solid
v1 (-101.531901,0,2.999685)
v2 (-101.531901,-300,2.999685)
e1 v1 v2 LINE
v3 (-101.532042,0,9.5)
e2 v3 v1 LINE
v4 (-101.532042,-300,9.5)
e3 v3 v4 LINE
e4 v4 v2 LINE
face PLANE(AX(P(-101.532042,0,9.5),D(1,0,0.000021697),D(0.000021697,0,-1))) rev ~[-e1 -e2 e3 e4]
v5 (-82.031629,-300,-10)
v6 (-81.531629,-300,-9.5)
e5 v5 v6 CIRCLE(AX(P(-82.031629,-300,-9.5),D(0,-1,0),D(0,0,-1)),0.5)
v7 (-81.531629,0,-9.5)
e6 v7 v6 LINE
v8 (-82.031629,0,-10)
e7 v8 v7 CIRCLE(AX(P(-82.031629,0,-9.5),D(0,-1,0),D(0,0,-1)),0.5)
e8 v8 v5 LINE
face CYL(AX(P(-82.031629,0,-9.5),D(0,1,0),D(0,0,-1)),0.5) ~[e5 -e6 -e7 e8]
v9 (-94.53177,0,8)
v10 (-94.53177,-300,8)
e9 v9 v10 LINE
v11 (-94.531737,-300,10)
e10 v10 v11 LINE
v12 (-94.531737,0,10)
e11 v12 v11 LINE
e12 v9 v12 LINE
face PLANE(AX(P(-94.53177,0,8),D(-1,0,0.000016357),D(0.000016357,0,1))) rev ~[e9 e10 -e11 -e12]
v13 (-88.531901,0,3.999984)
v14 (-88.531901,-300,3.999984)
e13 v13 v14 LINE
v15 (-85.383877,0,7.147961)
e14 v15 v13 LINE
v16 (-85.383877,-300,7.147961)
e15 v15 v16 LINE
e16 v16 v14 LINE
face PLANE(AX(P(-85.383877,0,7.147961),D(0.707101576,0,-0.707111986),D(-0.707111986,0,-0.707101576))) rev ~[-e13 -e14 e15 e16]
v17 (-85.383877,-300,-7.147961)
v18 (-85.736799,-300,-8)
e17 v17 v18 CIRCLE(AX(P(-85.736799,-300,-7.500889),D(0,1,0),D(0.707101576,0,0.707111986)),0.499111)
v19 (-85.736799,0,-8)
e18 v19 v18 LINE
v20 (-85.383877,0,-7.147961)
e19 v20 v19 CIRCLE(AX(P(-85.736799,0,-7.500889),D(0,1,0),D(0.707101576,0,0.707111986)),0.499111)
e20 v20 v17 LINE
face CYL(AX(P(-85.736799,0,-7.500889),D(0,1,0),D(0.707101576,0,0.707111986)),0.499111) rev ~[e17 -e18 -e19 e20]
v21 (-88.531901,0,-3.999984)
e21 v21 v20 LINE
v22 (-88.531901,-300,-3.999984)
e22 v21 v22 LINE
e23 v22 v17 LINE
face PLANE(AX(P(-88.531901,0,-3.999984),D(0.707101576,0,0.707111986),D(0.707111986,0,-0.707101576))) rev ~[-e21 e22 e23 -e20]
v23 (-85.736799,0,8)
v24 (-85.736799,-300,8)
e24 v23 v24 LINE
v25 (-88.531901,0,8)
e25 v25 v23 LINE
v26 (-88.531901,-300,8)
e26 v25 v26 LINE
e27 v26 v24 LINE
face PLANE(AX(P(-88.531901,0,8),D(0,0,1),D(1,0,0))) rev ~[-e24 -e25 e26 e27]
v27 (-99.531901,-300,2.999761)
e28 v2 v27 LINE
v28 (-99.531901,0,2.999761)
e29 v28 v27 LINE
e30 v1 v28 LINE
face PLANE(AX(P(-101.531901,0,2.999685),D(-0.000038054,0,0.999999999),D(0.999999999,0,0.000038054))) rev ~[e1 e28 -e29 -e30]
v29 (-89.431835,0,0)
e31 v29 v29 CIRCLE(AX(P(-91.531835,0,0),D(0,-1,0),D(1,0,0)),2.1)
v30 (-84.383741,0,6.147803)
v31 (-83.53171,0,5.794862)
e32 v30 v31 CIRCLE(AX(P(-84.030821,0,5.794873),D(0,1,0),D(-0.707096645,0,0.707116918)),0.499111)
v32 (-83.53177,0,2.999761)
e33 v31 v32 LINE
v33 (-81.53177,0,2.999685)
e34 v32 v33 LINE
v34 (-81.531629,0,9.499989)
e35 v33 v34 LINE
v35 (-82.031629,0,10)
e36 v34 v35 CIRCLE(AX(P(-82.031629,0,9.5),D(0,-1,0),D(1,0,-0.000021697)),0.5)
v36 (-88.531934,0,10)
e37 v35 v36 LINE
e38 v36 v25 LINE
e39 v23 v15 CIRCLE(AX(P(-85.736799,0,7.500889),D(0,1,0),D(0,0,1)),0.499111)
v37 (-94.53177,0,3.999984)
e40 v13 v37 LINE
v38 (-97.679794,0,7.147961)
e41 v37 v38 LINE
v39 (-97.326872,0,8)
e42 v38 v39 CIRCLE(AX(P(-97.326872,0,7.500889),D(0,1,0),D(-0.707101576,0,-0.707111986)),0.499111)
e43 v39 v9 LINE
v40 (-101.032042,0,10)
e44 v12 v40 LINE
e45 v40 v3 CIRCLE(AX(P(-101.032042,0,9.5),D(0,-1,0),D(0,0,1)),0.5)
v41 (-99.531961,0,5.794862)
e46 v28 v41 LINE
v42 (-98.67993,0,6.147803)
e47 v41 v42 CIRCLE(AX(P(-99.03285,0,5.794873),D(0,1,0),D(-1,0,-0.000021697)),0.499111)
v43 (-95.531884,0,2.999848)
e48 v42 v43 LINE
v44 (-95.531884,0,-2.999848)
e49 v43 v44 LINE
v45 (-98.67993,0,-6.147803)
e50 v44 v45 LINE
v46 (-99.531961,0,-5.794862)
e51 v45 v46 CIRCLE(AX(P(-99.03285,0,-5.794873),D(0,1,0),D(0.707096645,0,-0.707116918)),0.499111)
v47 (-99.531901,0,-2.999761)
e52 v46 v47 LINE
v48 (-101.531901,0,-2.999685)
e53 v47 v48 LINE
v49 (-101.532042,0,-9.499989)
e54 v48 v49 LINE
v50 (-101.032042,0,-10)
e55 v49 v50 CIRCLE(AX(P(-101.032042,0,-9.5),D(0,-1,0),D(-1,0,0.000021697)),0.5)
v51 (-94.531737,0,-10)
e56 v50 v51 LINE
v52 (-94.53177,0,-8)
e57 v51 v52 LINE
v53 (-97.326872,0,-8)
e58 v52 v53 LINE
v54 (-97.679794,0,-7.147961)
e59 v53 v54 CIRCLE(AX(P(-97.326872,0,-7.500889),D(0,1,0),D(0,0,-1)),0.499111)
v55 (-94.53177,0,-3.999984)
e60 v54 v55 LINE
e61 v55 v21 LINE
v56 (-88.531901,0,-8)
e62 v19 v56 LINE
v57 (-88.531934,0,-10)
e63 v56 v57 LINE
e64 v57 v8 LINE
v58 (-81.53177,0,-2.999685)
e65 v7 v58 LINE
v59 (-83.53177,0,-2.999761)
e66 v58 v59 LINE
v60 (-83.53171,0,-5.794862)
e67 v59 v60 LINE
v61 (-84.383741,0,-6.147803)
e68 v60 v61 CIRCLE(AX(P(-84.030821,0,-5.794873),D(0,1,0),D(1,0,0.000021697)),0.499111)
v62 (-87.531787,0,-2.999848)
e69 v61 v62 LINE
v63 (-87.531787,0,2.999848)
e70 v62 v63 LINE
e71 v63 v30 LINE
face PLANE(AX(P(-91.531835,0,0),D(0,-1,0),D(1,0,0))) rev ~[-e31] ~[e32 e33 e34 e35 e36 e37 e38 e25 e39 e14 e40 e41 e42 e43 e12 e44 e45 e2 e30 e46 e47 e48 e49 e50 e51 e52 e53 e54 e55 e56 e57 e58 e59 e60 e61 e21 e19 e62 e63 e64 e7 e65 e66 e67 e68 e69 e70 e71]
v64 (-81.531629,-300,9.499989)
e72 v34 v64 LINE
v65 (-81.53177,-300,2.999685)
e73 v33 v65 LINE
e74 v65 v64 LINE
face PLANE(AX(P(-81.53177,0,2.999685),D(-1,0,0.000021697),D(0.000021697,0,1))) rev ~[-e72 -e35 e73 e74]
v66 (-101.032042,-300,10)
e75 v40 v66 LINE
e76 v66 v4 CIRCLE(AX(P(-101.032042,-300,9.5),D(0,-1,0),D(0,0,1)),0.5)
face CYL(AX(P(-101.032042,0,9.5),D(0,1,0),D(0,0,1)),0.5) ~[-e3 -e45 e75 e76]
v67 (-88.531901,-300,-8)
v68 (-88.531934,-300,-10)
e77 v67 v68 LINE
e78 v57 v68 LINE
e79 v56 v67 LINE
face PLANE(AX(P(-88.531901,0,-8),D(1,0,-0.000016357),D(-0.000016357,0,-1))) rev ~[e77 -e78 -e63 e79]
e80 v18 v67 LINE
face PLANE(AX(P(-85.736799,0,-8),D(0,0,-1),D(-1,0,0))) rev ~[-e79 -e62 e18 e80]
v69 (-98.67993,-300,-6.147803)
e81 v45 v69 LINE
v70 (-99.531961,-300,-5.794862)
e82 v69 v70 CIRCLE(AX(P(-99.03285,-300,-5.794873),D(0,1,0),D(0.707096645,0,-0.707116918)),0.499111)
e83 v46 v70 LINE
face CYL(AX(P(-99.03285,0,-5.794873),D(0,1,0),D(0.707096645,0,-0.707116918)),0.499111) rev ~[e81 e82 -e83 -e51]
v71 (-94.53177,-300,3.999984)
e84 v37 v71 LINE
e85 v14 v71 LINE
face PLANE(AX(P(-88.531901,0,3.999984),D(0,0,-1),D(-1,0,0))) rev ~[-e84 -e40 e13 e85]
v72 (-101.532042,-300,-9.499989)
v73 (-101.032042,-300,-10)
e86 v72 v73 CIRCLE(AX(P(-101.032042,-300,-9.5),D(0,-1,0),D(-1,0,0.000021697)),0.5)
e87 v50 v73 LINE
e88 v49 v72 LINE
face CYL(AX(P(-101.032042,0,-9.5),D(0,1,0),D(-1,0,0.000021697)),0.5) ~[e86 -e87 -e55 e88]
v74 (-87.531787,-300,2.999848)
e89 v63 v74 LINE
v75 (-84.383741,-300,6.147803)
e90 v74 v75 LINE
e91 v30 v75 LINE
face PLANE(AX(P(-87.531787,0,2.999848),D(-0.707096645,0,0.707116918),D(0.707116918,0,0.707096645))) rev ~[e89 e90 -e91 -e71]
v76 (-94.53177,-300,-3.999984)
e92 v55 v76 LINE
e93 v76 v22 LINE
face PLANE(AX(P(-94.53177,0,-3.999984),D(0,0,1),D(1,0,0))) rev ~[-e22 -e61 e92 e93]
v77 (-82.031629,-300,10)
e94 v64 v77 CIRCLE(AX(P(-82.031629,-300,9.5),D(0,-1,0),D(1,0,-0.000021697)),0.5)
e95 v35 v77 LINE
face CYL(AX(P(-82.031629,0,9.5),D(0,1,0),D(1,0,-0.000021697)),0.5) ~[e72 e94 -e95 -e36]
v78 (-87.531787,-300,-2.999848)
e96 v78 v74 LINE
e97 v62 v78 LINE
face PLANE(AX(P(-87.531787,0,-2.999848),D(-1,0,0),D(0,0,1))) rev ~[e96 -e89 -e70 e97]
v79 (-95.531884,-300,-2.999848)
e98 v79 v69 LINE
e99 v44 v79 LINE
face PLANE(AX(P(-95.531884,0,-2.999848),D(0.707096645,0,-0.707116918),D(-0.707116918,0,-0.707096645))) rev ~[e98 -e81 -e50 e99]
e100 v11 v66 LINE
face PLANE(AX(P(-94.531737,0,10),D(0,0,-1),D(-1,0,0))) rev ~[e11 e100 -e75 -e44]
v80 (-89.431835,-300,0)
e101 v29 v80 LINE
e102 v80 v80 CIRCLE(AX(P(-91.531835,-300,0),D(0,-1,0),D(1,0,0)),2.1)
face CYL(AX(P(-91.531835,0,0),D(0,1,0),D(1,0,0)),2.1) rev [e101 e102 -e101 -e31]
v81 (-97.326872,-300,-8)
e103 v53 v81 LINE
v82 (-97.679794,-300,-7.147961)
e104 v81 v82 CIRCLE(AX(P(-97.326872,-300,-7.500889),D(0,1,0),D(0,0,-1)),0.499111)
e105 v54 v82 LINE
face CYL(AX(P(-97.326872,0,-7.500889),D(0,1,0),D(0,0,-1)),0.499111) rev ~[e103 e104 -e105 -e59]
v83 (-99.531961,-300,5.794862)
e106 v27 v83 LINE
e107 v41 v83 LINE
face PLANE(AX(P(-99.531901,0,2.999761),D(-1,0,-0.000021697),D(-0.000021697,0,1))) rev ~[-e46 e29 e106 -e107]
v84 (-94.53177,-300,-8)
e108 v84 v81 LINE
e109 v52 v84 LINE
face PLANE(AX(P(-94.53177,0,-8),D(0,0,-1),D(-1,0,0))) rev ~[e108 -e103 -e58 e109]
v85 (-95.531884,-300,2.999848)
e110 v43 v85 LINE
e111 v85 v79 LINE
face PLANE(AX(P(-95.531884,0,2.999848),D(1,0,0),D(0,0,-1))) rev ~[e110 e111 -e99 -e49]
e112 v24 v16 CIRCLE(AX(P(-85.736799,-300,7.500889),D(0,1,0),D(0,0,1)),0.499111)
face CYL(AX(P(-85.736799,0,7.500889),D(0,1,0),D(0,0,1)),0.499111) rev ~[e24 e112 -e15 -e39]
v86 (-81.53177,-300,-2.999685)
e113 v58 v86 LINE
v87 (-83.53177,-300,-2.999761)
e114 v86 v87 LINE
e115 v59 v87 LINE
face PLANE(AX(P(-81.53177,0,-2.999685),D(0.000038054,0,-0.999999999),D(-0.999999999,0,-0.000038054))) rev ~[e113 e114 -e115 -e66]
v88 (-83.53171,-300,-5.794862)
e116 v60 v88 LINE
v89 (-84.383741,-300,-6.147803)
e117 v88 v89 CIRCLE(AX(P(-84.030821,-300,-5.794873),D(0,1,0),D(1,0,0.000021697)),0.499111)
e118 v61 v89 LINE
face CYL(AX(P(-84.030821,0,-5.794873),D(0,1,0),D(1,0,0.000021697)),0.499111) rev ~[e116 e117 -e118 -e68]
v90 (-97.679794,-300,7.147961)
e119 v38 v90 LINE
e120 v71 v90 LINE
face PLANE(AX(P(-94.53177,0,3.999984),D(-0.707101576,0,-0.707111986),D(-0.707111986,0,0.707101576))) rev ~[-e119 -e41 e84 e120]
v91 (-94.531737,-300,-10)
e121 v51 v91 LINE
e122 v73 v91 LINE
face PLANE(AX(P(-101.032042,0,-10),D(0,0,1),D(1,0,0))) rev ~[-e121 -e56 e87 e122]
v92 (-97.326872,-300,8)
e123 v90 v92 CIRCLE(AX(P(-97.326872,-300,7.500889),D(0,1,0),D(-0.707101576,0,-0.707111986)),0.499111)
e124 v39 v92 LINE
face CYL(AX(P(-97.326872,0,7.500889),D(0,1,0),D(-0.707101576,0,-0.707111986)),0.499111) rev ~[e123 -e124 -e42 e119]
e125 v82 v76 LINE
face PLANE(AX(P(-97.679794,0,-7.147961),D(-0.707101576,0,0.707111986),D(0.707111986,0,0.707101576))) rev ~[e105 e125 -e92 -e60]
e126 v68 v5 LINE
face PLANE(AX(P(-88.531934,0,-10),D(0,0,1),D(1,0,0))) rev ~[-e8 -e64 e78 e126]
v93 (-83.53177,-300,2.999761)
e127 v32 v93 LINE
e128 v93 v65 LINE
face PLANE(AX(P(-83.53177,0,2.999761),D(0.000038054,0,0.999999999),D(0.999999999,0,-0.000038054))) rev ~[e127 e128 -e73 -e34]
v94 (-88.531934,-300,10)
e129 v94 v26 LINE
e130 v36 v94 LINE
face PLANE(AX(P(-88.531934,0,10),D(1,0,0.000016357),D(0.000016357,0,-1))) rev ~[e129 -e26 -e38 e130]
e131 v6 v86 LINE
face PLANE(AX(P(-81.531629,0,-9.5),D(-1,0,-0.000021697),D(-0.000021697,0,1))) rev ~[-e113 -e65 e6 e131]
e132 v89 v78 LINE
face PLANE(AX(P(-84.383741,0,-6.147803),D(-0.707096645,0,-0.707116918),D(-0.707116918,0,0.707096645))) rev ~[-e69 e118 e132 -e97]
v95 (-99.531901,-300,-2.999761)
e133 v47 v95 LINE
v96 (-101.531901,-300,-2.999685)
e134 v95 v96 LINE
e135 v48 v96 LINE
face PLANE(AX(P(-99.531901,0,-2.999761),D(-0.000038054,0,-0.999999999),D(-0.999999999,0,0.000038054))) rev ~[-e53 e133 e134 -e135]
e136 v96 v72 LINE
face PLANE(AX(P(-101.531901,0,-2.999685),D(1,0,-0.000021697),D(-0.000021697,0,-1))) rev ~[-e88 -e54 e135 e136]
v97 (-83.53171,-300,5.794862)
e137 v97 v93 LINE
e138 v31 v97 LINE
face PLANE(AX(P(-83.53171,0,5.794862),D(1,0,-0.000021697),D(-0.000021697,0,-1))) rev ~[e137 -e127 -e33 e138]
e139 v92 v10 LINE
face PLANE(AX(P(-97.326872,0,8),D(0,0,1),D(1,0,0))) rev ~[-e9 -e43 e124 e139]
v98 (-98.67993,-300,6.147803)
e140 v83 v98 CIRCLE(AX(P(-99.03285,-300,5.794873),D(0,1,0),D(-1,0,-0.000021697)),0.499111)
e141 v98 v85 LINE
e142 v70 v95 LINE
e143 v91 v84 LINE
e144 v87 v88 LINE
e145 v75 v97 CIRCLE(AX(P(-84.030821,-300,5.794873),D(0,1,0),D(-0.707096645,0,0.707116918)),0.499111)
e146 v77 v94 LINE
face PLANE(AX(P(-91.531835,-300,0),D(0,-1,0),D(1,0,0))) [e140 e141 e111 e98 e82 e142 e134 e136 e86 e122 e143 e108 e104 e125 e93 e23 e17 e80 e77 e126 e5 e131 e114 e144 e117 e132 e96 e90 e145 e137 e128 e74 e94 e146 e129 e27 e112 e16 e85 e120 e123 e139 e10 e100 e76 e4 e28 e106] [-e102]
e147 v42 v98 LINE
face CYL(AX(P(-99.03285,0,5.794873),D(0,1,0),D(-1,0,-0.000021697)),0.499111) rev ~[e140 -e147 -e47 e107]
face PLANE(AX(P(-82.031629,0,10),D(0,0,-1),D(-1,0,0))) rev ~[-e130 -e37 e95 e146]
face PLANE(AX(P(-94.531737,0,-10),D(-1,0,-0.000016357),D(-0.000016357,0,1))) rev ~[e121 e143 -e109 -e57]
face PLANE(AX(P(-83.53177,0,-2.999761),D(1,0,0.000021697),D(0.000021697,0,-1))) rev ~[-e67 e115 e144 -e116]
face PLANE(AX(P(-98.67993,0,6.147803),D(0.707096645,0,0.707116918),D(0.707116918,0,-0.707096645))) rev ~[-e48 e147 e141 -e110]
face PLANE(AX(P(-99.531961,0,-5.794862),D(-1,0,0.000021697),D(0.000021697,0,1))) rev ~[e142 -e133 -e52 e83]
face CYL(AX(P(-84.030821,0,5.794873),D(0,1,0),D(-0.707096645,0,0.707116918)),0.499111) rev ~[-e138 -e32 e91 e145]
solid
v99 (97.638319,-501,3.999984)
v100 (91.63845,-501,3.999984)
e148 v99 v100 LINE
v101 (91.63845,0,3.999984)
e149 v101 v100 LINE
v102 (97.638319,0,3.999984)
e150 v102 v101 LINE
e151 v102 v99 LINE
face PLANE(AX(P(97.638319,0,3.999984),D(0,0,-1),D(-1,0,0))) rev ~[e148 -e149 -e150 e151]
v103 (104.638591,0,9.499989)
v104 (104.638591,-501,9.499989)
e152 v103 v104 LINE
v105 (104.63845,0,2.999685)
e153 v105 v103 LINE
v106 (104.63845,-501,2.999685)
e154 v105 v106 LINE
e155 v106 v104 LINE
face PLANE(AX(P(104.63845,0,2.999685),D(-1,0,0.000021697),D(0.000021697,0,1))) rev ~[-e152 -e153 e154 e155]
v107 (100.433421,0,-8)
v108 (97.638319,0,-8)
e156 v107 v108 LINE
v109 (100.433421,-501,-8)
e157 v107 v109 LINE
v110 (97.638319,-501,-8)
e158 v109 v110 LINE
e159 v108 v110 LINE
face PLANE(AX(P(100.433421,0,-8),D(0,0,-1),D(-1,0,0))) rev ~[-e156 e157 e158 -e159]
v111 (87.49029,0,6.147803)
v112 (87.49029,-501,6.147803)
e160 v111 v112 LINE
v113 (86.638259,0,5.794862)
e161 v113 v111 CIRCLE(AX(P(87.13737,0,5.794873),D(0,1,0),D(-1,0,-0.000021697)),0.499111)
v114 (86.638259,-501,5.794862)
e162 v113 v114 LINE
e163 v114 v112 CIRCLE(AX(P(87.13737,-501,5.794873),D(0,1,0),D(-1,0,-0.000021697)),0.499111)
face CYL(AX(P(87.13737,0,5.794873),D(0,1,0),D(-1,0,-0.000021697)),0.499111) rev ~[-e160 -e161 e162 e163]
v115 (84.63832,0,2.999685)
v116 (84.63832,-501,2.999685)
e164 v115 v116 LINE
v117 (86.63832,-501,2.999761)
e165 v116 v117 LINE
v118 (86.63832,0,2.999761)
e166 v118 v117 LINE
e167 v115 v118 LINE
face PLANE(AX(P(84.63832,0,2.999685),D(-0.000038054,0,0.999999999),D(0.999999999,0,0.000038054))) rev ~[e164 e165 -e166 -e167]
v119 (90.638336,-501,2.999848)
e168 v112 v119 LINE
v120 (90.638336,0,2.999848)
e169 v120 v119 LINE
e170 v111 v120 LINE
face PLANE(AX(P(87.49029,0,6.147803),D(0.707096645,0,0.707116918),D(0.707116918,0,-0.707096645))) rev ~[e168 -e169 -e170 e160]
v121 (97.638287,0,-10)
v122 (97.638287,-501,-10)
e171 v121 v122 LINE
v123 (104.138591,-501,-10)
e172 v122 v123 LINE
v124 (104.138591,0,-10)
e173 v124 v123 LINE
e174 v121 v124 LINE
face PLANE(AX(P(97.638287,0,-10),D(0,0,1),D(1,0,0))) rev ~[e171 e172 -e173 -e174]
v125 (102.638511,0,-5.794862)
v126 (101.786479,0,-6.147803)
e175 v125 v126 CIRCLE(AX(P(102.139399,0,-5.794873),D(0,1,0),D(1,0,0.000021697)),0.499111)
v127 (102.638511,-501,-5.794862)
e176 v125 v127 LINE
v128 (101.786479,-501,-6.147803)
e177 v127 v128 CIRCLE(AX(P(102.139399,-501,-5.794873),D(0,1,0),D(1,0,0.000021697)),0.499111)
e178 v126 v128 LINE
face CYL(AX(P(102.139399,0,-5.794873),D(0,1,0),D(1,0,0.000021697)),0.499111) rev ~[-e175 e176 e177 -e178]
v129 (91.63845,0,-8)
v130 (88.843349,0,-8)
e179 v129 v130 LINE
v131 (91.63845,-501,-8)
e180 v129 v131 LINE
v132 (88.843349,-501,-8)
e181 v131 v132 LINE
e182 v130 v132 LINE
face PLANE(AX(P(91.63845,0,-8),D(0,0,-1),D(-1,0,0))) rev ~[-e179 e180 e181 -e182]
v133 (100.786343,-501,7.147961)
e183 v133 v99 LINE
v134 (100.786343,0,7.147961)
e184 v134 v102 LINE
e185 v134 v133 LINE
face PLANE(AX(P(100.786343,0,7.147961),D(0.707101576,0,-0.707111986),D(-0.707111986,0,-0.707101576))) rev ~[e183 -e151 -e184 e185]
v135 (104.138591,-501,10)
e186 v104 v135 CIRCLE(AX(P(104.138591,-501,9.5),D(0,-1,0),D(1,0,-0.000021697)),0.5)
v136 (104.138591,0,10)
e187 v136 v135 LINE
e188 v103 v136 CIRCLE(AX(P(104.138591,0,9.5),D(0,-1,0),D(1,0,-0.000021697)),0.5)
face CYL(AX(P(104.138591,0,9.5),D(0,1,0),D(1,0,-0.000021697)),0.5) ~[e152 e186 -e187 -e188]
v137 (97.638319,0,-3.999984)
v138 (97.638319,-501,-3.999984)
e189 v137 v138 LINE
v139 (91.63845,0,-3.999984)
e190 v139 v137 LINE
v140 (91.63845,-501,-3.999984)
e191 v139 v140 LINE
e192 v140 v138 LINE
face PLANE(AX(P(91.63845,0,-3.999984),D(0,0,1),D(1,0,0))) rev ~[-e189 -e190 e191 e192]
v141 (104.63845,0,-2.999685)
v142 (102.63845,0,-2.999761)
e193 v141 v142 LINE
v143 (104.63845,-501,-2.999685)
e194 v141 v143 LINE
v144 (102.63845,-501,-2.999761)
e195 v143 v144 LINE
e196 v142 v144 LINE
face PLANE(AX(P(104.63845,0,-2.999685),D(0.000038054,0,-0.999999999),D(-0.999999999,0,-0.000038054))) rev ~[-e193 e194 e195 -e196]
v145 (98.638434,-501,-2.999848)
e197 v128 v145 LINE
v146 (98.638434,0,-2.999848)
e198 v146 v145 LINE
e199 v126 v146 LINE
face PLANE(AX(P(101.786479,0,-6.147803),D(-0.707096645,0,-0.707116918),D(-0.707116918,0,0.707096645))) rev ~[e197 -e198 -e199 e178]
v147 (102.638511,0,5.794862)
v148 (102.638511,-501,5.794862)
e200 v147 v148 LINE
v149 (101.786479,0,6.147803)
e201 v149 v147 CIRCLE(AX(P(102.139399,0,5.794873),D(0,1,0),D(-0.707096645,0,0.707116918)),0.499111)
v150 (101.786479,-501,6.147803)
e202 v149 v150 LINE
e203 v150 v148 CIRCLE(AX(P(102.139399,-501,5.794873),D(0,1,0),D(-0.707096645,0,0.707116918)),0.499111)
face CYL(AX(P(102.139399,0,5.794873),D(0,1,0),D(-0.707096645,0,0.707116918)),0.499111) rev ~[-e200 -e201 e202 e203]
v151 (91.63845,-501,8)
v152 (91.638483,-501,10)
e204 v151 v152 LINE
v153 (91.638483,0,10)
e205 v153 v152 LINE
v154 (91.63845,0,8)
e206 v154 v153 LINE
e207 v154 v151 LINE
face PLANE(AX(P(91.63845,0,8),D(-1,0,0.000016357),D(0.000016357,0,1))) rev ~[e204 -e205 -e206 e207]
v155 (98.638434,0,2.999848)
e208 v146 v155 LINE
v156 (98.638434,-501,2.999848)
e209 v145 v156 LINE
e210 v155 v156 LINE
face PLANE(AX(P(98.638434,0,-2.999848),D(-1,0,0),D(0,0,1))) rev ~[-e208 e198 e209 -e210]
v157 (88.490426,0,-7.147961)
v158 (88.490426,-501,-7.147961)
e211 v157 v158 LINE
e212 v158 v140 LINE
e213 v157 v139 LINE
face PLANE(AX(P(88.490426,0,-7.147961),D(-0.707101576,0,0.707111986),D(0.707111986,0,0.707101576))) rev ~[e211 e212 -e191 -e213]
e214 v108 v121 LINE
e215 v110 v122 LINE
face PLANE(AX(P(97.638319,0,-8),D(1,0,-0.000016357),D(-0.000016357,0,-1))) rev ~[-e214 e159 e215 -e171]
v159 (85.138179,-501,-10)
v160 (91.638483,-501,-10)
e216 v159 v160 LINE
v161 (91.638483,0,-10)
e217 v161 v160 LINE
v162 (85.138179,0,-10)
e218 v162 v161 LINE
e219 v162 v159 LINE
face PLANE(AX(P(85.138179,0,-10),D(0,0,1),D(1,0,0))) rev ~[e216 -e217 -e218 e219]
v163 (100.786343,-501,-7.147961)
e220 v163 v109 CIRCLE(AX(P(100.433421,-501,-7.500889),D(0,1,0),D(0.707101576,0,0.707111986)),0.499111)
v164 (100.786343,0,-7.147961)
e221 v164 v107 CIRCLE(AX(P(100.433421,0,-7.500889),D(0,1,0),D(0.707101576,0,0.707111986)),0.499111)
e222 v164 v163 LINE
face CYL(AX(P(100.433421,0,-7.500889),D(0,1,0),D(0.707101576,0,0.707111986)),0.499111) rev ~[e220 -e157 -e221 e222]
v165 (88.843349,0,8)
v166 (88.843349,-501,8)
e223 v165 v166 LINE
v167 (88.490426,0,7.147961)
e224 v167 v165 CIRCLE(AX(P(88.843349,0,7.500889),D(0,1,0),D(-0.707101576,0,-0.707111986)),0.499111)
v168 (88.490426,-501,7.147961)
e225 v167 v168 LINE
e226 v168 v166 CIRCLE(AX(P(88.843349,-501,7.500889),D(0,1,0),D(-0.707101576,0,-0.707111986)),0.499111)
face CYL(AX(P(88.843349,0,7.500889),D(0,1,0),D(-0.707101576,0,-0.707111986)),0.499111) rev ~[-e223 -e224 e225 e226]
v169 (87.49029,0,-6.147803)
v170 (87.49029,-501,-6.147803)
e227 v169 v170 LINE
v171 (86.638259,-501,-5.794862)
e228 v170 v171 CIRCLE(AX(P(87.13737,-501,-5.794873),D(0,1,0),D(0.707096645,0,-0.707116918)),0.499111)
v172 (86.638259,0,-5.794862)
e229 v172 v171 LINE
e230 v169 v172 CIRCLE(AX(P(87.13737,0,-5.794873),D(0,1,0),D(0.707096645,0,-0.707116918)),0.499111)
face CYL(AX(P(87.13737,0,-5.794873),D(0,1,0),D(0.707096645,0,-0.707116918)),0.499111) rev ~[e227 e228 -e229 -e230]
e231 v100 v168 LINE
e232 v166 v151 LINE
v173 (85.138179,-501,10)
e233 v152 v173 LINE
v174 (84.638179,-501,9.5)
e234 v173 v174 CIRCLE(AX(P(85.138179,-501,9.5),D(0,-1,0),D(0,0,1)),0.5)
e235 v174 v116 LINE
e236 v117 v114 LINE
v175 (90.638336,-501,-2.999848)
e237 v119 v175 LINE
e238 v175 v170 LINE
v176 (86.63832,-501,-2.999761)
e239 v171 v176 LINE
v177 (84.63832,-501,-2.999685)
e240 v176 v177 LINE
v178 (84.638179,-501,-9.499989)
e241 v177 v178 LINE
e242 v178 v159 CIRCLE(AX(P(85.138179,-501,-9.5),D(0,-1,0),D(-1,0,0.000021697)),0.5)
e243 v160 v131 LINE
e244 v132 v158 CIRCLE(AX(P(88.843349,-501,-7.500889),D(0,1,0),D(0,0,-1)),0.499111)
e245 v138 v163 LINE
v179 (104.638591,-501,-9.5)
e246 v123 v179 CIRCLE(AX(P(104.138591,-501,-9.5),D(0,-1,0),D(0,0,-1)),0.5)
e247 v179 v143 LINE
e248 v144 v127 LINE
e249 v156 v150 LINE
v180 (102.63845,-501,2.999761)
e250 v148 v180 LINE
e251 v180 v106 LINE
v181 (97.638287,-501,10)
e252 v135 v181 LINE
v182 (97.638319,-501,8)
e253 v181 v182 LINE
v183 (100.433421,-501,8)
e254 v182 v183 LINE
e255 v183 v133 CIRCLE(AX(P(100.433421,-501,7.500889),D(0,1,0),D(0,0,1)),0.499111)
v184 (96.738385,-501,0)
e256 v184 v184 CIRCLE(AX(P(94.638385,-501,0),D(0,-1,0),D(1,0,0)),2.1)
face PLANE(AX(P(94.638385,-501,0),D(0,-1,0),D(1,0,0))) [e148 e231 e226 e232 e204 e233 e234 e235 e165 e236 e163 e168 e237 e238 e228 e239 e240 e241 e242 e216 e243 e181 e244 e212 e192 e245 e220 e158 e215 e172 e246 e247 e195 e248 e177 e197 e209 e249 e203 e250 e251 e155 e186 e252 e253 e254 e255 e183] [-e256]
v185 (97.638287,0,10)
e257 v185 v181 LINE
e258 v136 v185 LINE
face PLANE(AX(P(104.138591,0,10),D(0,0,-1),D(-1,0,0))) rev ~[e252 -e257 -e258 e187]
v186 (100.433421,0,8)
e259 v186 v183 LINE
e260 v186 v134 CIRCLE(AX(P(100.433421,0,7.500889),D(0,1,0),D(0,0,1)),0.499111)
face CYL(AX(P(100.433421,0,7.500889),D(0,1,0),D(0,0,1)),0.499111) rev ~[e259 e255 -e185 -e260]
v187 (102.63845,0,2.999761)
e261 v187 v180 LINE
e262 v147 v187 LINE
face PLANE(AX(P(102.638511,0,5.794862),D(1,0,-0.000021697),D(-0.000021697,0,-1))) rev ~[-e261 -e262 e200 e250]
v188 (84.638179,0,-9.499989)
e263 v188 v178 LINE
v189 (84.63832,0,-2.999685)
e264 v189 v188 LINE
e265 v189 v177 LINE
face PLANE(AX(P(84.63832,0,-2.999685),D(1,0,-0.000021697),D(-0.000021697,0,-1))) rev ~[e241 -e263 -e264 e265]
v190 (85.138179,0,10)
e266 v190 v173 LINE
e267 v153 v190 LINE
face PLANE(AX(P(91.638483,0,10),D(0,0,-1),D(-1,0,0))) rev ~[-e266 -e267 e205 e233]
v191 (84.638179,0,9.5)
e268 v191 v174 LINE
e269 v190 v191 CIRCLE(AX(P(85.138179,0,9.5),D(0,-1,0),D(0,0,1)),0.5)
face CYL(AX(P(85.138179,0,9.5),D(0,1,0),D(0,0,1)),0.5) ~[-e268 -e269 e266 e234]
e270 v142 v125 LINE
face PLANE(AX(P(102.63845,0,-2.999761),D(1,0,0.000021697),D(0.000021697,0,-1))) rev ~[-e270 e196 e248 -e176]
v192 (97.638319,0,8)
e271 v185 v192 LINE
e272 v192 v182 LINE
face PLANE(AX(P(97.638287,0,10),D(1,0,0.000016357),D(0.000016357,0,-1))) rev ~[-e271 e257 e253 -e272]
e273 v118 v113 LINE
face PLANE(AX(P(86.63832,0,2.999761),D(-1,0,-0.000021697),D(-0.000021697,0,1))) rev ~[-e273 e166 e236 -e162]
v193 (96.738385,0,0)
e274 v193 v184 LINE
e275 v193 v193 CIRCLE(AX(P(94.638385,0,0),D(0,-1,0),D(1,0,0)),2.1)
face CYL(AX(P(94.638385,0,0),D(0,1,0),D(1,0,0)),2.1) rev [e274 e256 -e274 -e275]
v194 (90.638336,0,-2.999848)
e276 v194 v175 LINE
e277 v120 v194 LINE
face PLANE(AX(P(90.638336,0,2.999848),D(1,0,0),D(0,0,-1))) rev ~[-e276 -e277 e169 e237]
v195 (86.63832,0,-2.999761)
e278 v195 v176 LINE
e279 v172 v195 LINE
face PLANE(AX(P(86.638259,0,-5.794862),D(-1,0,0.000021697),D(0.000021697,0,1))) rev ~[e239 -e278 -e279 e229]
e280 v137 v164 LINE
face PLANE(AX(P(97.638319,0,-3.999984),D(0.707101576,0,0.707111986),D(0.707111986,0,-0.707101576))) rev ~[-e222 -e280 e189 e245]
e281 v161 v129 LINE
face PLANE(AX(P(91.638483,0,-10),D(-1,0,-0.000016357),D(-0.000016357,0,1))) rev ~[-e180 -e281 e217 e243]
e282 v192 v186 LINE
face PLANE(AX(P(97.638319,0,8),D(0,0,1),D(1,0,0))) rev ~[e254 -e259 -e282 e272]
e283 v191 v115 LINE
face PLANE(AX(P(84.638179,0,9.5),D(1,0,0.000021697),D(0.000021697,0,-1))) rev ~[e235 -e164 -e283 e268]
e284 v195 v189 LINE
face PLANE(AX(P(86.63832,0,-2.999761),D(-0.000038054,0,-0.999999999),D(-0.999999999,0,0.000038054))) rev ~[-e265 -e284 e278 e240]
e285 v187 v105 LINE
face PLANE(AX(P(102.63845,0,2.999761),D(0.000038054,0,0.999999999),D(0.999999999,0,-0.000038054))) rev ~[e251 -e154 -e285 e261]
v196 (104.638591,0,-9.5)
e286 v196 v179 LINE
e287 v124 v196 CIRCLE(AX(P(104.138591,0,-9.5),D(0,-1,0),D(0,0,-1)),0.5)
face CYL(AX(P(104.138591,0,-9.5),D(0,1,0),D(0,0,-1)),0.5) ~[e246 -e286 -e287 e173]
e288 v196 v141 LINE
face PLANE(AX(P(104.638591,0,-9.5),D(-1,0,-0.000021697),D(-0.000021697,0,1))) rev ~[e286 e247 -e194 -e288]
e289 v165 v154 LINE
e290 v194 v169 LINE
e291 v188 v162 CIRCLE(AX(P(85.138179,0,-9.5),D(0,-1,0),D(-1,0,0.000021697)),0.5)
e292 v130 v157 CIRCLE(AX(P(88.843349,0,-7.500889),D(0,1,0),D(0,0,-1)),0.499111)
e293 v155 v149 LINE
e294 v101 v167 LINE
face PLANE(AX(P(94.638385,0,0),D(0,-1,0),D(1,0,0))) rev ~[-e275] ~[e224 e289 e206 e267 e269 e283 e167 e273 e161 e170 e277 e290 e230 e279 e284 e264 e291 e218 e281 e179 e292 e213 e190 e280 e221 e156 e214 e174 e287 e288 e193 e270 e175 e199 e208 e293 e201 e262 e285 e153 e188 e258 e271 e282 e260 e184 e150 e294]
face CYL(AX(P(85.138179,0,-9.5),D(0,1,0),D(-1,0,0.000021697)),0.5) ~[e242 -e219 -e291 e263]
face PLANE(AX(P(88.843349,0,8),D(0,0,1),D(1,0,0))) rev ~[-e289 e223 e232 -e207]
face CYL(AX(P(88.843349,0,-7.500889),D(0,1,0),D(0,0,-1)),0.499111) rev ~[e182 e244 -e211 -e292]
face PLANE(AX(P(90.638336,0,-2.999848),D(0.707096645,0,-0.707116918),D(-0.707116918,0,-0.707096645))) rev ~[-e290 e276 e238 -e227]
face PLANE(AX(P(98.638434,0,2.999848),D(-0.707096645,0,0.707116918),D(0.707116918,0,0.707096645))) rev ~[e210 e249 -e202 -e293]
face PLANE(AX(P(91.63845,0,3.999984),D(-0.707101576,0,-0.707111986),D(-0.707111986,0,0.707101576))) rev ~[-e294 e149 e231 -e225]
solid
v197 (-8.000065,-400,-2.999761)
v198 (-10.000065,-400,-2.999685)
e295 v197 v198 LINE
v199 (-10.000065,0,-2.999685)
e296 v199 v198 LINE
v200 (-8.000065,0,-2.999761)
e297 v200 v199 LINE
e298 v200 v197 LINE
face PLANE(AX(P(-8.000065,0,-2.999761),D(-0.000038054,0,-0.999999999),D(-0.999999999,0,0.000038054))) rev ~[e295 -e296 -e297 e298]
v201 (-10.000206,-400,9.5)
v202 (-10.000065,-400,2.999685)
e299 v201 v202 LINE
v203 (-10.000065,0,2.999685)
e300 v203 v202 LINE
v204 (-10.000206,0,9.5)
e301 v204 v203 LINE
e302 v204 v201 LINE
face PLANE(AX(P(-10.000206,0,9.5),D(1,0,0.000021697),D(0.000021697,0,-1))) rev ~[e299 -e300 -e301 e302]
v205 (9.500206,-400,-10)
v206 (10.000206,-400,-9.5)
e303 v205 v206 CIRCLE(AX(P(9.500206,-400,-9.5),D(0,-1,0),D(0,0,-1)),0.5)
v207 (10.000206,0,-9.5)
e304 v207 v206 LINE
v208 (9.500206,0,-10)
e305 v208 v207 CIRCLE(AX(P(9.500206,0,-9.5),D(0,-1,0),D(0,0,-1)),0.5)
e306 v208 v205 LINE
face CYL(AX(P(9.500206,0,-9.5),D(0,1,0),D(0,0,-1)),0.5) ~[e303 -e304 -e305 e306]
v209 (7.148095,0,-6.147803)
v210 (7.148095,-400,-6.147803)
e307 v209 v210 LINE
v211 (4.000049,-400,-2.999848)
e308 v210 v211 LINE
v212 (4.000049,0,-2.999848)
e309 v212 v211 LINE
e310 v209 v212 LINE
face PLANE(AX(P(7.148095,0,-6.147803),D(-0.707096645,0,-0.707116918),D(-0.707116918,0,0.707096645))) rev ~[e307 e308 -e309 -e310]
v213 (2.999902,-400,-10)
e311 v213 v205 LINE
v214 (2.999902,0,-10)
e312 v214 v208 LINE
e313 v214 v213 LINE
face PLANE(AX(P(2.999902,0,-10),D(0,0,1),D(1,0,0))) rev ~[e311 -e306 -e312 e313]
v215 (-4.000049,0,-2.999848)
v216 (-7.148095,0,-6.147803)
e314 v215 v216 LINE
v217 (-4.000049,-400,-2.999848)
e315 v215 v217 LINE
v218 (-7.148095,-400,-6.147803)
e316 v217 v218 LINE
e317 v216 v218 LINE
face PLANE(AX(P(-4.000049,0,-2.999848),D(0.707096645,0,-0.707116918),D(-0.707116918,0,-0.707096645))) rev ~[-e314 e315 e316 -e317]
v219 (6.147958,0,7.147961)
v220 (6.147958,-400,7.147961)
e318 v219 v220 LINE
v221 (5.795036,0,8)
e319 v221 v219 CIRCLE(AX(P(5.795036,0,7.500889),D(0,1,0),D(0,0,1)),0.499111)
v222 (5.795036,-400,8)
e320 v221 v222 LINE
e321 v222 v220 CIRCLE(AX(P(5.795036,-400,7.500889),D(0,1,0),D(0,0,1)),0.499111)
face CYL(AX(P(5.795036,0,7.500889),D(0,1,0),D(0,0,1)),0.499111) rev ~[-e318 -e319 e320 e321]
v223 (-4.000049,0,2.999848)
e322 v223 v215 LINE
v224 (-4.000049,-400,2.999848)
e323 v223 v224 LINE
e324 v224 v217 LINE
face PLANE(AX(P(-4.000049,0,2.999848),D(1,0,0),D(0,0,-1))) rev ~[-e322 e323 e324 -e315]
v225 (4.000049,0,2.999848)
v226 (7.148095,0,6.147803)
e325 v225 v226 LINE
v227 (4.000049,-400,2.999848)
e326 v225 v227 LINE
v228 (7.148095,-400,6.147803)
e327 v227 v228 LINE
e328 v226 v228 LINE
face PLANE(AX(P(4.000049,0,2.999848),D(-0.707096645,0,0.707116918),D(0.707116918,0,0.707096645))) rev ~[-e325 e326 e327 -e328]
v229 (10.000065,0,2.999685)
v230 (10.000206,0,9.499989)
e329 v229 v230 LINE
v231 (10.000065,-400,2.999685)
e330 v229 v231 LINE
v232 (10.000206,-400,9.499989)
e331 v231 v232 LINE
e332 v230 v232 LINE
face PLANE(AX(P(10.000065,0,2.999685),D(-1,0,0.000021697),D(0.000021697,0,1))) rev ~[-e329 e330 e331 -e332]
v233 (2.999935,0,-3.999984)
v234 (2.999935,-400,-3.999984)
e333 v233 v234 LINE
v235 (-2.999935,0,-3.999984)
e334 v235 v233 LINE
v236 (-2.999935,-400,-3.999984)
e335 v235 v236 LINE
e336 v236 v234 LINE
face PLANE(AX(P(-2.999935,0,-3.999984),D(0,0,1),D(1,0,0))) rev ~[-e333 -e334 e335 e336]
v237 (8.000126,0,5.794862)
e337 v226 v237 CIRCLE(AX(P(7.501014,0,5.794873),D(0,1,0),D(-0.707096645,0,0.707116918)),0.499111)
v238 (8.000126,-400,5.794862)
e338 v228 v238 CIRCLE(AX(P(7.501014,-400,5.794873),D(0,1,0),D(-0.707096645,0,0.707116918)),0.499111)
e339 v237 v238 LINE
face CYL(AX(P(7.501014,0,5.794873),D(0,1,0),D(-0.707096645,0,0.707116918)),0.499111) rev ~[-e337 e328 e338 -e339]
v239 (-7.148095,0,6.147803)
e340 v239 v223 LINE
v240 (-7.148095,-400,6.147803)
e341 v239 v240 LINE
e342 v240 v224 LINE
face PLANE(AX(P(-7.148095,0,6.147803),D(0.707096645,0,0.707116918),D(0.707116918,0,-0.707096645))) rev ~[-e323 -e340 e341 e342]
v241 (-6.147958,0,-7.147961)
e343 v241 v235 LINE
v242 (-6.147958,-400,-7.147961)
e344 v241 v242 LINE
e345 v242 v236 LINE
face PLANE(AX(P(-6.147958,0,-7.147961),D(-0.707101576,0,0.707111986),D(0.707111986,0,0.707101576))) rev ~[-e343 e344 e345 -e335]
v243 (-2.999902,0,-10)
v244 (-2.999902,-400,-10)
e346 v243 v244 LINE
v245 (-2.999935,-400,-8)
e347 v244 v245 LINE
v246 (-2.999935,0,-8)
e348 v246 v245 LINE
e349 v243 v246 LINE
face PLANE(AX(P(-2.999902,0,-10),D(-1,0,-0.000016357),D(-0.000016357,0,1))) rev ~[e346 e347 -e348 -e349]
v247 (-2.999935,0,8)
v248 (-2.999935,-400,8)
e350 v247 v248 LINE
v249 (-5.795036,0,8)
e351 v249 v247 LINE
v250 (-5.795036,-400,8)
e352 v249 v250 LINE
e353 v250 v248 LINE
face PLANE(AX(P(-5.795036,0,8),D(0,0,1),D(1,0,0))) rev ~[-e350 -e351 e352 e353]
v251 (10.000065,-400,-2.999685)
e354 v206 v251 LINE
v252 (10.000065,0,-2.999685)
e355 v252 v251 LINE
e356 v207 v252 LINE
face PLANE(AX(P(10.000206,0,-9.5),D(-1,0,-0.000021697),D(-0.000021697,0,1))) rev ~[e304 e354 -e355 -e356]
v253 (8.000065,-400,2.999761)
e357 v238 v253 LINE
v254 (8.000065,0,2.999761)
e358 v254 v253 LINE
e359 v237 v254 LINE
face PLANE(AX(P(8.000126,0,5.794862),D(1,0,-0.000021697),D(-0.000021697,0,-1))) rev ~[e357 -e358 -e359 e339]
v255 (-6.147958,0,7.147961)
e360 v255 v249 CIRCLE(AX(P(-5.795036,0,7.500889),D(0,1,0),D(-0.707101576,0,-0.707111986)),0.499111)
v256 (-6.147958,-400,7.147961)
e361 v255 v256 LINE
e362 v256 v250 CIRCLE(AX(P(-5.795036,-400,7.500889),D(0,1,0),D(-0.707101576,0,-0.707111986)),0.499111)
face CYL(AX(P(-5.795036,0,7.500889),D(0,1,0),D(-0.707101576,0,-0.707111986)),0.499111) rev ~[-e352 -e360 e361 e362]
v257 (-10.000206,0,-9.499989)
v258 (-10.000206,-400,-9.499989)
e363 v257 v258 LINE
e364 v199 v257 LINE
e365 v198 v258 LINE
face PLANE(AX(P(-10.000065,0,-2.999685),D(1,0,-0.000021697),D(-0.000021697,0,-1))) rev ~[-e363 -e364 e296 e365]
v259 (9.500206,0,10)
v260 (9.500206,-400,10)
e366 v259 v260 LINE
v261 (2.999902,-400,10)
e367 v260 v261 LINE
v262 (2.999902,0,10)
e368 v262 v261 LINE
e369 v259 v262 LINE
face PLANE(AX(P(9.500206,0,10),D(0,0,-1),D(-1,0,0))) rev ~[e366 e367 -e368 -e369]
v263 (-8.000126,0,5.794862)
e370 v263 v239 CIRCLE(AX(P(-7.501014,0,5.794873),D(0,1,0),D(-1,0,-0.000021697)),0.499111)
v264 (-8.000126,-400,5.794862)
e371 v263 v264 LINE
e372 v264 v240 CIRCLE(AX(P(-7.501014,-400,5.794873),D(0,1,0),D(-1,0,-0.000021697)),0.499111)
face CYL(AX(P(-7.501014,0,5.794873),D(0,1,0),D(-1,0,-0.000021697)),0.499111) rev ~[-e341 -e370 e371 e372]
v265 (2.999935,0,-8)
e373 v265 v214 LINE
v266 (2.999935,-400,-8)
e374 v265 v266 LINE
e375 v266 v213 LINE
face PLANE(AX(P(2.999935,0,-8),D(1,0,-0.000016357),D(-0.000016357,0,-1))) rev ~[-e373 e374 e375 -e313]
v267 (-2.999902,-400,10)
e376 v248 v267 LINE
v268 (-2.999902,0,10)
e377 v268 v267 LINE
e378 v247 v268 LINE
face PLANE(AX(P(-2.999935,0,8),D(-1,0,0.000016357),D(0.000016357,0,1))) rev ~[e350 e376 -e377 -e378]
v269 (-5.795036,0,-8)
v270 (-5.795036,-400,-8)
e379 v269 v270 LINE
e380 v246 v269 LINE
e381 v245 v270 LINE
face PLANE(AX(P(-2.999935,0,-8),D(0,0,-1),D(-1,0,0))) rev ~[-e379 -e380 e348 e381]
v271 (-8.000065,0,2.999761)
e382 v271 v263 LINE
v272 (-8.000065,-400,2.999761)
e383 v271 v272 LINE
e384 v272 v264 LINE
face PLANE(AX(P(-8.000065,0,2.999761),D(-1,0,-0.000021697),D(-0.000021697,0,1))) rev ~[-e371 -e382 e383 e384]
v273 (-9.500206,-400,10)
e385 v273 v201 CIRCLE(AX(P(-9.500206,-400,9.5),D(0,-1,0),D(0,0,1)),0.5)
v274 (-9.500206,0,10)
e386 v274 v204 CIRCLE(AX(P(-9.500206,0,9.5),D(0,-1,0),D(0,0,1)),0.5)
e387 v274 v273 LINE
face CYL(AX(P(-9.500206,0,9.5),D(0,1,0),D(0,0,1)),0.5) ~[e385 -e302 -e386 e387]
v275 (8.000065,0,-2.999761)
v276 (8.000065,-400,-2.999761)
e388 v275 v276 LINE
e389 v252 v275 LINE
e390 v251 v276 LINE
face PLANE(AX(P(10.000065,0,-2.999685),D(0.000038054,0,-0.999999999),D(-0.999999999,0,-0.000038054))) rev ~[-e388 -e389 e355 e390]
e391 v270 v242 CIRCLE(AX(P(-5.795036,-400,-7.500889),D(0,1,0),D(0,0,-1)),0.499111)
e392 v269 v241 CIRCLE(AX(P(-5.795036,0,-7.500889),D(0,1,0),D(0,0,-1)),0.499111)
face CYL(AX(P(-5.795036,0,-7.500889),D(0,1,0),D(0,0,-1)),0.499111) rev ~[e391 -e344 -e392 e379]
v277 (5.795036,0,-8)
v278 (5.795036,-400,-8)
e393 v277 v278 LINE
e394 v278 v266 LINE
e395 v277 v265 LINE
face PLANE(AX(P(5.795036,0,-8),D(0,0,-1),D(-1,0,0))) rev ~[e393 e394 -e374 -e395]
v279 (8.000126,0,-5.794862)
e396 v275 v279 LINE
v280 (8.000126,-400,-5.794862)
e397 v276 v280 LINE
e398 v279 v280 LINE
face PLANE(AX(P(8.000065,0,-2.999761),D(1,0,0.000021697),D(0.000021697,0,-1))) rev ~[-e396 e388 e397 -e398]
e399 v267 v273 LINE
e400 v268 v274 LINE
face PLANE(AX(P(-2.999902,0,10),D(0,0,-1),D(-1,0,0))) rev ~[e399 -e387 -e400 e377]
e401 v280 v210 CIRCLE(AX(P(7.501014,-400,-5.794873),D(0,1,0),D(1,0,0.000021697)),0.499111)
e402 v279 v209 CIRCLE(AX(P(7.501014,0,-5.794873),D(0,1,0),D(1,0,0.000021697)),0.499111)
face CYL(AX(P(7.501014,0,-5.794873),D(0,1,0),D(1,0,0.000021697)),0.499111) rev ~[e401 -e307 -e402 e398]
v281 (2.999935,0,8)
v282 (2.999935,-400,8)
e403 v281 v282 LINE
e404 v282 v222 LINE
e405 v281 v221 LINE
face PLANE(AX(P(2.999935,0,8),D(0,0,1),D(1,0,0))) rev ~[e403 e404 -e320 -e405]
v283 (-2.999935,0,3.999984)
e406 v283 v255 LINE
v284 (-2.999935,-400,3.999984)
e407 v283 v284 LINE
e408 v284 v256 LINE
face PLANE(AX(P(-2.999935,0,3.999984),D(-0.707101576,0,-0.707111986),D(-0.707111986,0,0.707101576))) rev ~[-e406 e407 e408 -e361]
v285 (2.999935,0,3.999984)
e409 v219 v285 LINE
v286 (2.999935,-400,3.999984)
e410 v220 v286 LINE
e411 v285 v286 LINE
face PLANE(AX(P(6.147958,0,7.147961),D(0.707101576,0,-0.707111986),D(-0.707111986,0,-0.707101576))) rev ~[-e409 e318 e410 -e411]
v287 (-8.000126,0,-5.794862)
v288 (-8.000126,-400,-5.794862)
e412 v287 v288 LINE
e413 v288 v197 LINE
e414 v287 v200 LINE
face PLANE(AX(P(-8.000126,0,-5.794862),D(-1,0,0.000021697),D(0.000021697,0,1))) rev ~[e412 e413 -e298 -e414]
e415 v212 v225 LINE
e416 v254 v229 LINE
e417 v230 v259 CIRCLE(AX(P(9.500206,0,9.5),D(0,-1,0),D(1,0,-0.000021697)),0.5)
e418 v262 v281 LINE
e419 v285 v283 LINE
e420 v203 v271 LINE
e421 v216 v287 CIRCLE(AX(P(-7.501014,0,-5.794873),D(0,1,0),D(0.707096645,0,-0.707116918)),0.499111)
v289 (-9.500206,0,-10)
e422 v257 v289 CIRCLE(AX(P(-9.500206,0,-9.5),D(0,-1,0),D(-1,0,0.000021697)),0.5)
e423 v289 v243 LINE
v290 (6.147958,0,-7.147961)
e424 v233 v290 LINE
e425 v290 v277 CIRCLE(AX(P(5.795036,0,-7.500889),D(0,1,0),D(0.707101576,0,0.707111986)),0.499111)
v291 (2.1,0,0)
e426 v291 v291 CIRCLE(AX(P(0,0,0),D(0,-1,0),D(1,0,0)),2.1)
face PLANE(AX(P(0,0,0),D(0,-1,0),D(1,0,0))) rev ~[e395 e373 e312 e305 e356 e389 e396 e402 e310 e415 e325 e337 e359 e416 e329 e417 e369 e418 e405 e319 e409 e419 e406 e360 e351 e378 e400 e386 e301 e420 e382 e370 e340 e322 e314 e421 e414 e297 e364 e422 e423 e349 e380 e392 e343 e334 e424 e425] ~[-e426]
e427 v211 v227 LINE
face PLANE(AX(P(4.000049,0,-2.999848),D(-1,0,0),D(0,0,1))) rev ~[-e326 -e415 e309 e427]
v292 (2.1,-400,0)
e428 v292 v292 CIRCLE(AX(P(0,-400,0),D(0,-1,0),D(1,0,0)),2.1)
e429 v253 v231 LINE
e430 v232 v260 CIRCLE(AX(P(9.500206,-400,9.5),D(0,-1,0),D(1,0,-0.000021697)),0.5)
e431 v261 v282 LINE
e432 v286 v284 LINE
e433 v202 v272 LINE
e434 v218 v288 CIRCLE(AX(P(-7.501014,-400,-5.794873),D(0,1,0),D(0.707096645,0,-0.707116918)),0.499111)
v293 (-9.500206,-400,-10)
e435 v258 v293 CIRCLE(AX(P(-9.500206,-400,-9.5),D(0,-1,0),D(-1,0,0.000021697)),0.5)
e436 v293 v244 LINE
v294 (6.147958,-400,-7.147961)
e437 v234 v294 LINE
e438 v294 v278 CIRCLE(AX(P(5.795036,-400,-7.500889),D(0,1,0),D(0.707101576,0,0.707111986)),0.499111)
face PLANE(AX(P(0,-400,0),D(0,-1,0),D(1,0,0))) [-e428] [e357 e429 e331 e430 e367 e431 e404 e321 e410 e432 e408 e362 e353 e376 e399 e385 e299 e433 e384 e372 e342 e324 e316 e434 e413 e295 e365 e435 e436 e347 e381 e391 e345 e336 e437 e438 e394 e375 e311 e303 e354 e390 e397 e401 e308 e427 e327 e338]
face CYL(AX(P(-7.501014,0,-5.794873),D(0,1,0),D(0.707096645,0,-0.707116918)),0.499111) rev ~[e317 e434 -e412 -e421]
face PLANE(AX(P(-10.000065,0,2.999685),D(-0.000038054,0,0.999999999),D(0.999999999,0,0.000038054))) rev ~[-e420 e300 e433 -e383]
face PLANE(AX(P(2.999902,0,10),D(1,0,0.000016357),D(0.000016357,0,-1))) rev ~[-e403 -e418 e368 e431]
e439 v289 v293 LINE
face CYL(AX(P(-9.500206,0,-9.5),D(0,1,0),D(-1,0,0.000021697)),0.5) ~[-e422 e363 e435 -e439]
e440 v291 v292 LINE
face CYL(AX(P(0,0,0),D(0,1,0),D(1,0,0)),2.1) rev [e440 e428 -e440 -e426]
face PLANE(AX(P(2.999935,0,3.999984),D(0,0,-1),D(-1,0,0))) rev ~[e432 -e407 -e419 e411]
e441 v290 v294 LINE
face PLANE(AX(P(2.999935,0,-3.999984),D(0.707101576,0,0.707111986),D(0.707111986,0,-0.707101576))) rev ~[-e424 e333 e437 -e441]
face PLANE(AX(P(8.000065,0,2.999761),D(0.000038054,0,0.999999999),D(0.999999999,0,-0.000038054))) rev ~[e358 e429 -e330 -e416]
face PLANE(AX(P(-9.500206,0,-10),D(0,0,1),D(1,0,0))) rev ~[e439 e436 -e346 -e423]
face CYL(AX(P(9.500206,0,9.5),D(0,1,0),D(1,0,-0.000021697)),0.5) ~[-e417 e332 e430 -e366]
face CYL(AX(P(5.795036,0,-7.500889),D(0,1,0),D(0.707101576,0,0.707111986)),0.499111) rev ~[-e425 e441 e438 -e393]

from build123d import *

# Parameters (mm, degrees)
F0_R     = 2.1
F1_DEPTH = 400
F2_DEPTH = 300
F3_DEPTH = 501


# Not quite as in the source:
# - ends of sketch curves that miss each other by under 0.0002 mm in the source are joined


with BuildPart() as f1:
    # F0 (on Front) → F1 (new body)
    with BuildSketch(Plane.XZ):
        with BuildLine():
            Line((-2.9999018588, 10), (-9.5002061197, 10))
            ThreePointArc((-9.5002061197, 10), (-9.8537595103, 9.8535533906), (-10.0002061197, 9.5))
            Line((-10.0002061197, 9.5), (-10.0000650851, 2.9996848913))
            Line((-10.0000650851, 2.9996848913), (-8.0000650797, 2.9997609984))
            Line((-8.0000650797, 2.9997609984), (-8.0001257238, 5.7948624374))
            ThreePointArc((-8.0001257238, 5.7948624374), (-7.6920243598, 6.2559885353), (-7.1480945067, 6.147803307))
            Line((-7.1480945067, 6.147803307), (-4.0000487303, 2.9998477851))
            Line((-4.0000487303, 2.9998477851), (-4.0000487303, -2.9998477851))
            Line((-4.0000487303, -2.9998477851), (-7.1480945067, -6.147803307))
            ThreePointArc((-7.1480945067, -6.147803307), (-7.6920243598, -6.2559885353), (-8.0001257238, -5.7948624374))
            Line((-8.0001257238, -5.7948624374), (-8.0000650797, -2.9997609984))
            Line((-8.0000650797, -2.9997609984), (-10.0000650851, -2.9996848913))
            Line((-10.0000650851, -2.9996848913), (-10.0002061194, -9.4999891517))
            ThreePointArc((-10.0002061194, -9.4999891517), (-9.8537595103, -9.8535533906), (-9.5002061197, -10))
            Line((-9.5002061197, -10), (-2.9999018588, -10))
            Line((-2.9999018588, -10), (-2.9999345728, -7.9999999934))
            Line((-2.9999345728, -7.9999999934), (-5.7950360114, -7.9999999934))
            ThreePointArc((-5.7950360114, -7.9999999934), (-6.2561554244, -7.6918886246), (-6.1479583947, -7.1479611189))
            Line((-6.1479583947, -7.1479611189), (-2.9999345717, -3.9999836431))
            Line((-2.9999345717, -3.9999836431), (2.9999345717, -3.9999836431))
            Line((2.9999345717, -3.9999836431), (6.1479583947, -7.1479611189))
            ThreePointArc((6.1479583947, -7.1479611189), (6.2561554244, -7.6918886246), (5.7950360114, -7.9999999934))
            Line((5.7950360114, -7.9999999934), (2.9999345728, -7.9999999934))
            Line((2.9999345728, -7.9999999934), (2.9999018588, -10))
            Line((2.9999018588, -10), (9.5002061197, -10))
            ThreePointArc((9.5002061197, -10), (9.8537595103, -9.8535533906), (10.0002061197, -9.5))
            Line((10.0002061197, -9.5), (10.0000650851, -2.9996848913))
            Line((10.0000650851, -2.9996848913), (8.0000650797, -2.9997609984))
            Line((8.0000650797, -2.9997609984), (8.0001257238, -5.7948624374))
            ThreePointArc((8.0001257238, -5.7948624374), (7.6920243598, -6.2559885353), (7.1480945067, -6.147803307))
            Line((7.1480945067, -6.147803307), (4.0000487303, -2.9998477851))
            Line((4.0000487303, -2.9998477851), (4.0000487303, 2.9998477851))
            Line((4.0000487303, 2.9998477851), (7.1480945067, 6.147803307))
            ThreePointArc((7.1480945067, 6.147803307), (7.6920243598, 6.2559885353), (8.0001257238, 5.7948624374))
            Line((8.0001257238, 5.7948624374), (8.0000650797, 2.9997609984))
            Line((8.0000650797, 2.9997609984), (10.0000650851, 2.9996848913))
            Line((10.0000650851, 2.9996848913), (10.0002061194, 9.4999891517))
            ThreePointArc((10.0002061194, 9.4999891517), (9.8537595103, 9.8535533906), (9.5002061197, 10))
            Line((9.5002061197, 10), (2.9999018588, 10))
            Line((2.9999018588, 10), (2.9999345728, 7.9999999934))
            Line((2.9999345728, 7.9999999934), (5.7950360114, 7.9999999934))
            ThreePointArc((5.7950360114, 7.9999999934), (6.2561554244, 7.6918886246), (6.1479583947, 7.1479611189))
            Line((6.1479583947, 7.1479611189), (2.9999345717, 3.9999836431))
            Line((2.9999345717, 3.9999836431), (-2.9999345717, 3.9999836431))
            Line((-2.9999345717, 3.9999836431), (-6.1479583947, 7.1479611189))
            ThreePointArc((-6.1479583947, 7.1479611189), (-6.2561554244, 7.6918886246), (-5.7950360114, 7.9999999934))
            Line((-5.7950360114, 7.9999999934), (-2.9999345728, 7.9999999934))
            Line((-2.9999345728, 7.9999999934), (-2.9999018588, 10))
        make_face()
        Circle(F0_R, mode=Mode.SUBTRACT)
    extrude(amount=F1_DEPTH)


with BuildPart() as f2:
    # F0 (on Front) → F2 (new body)
    with BuildSketch(Plane.XZ):
        with BuildLine():
            Line((-83.5317097726, 5.7948624374), (-83.5317704167, 2.9997609984))
            Line((-83.5317704167, 2.9997609984), (-81.5317704113, 2.9996848913))
            Line((-81.5317704113, 2.9996848913), (-81.531629377, 9.4999891517))
            ThreePointArc((-81.531629377, 9.4999891517), (-81.6780759861, 9.8535533906), (-82.0316293767, 10))
            Line((-82.0316293767, 10), (-88.5319336376, 10))
            Line((-88.5319336376, 10), (-88.5319009236, 7.9999999934))
            Line((-88.5319009236, 7.9999999934), (-85.736799485, 7.9999999934))
            ThreePointArc((-85.736799485, 7.9999999934), (-85.275680072, 7.6918886246), (-85.3838771017, 7.1479611189))
            Line((-85.3838771017, 7.1479611189), (-88.5319009247, 3.9999836431))
            Line((-88.5319009247, 3.9999836431), (-94.5317700681, 3.9999836431))
            Line((-94.5317700681, 3.9999836431), (-97.6797938911, 7.1479611189))
            ThreePointArc((-97.6797938911, 7.1479611189), (-97.7879909208, 7.6918886246), (-97.3268715078, 7.9999999934))
            Line((-97.3268715078, 7.9999999934), (-94.5317700692, 7.9999999934))
            Line((-94.5317700692, 7.9999999934), (-94.5317373552, 10))
            Line((-94.5317373552, 10), (-101.0320416161, 10))
            ThreePointArc((-101.0320416161, 10), (-101.3855950067, 9.8535533906), (-101.5320416161, 9.5))
            Line((-101.5320416161, 9.5), (-101.5319005815, 2.9996848913))
            Line((-101.5319005815, 2.9996848913), (-99.5319005761, 2.9997609984))
            Line((-99.5319005761, 2.9997609984), (-99.5319612202, 5.7948624374))
            ThreePointArc((-99.5319612202, 5.7948624374), (-99.2238598562, 6.2559885353), (-98.6799300032, 6.147803307))
            Line((-98.6799300032, 6.147803307), (-95.5318842267, 2.9998477851))
            Line((-95.5318842267, 2.9998477851), (-95.5318842267, -2.9998477851))
            Line((-95.5318842267, -2.9998477851), (-98.6799300032, -6.147803307))
            ThreePointArc((-98.6799300032, -6.147803307), (-99.2238598562, -6.2559885353), (-99.5319612202, -5.7948624374))
            Line((-99.5319612202, -5.7948624374), (-99.5319005761, -2.9997609984))
            Line((-99.5319005761, -2.9997609984), (-101.5319005815, -2.9996848913))
            Line((-101.5319005815, -2.9996848913), (-101.5320416159, -9.4999891517))
            ThreePointArc((-101.5320416159, -9.4999891517), (-101.3855950067, -9.8535533906), (-101.0320416161, -10))
            Line((-101.0320416161, -10), (-94.5317373552, -10))
            Line((-94.5317373552, -10), (-94.5317700692, -7.9999999934))
            Line((-94.5317700692, -7.9999999934), (-97.3268715078, -7.9999999934))
            ThreePointArc((-97.3268715078, -7.9999999934), (-97.7879909208, -7.6918886246), (-97.6797938911, -7.1479611189))
            Line((-97.6797938911, -7.1479611189), (-94.5317700681, -3.9999836431))
            Line((-94.5317700681, -3.9999836431), (-88.5319009247, -3.9999836431))
            Line((-88.5319009247, -3.9999836431), (-85.3838771017, -7.1479611189))
            ThreePointArc((-85.3838771017, -7.1479611189), (-85.275680072, -7.6918886246), (-85.736799485, -7.9999999934))
            Line((-85.736799485, -7.9999999934), (-88.5319009236, -7.9999999934))
            Line((-88.5319009236, -7.9999999934), (-88.5319336376, -10))
            Line((-88.5319336376, -10), (-82.0316293767, -10))
            ThreePointArc((-82.0316293767, -10), (-81.6780759861, -9.8535533906), (-81.5316293767, -9.5))
            Line((-81.5316293767, -9.5), (-81.5317704113, -2.9996848913))
            Line((-81.5317704113, -2.9996848913), (-83.5317704167, -2.9997609984))
            Line((-83.5317704167, -2.9997609984), (-83.5317097726, -5.7948624374))
            ThreePointArc((-83.5317097726, -5.7948624374), (-83.8398111366, -6.2559885353), (-84.3837409897, -6.147803307))
            Line((-84.3837409897, -6.147803307), (-87.5317867661, -2.9998477851))
            Line((-87.5317867661, -2.9998477851), (-87.5317867661, 2.9998477851))
            Line((-87.5317867661, 2.9998477851), (-84.3837409897, 6.147803307))
            ThreePointArc((-84.3837409897, 6.147803307), (-83.8398111366, 6.2559885353), (-83.5317097726, 5.7948624374))
        make_face()
        with Locations((-91.5318354964, 0)):
            Circle(F0_R, mode=Mode.SUBTRACT)
    extrude(amount=F2_DEPTH)


with BuildPart() as f3:
    # F0 (on Front) → F3 (new body)
    with BuildSketch(Plane.XZ):
        with BuildLine():
            Line((100.43342089, -7.9999999934), (97.6383194514, -7.9999999934))
            Line((97.6383194514, -7.9999999934), (97.6382867374, -10))
            Line((97.6382867374, -10), (104.1385909983, -10))
            ThreePointArc((104.1385909983, -10), (104.4921443889, -9.8535533906), (104.6385909983, -9.5))
            Line((104.6385909983, -9.5), (104.6384499637, -2.9996848913))
            Line((104.6384499637, -2.9996848913), (102.6384499583, -2.9997609984))
            Line((102.6384499583, -2.9997609984), (102.6385106025, -5.7948624374))
            ThreePointArc((102.6385106025, -5.7948624374), (102.3304092384, -6.2559885353), (101.7864793854, -6.147803307))
            Line((101.7864793854, -6.147803307), (98.638433609, -2.9998477851))
            Line((98.638433609, -2.9998477851), (98.638433609, 2.9998477851))
            Line((98.638433609, 2.9998477851), (101.7864793854, 6.147803307))
            ThreePointArc((101.7864793854, 6.147803307), (102.3304092384, 6.2559885353), (102.6385106025, 5.7948624374))
            Line((102.6385106025, 5.7948624374), (102.6384499583, 2.9997609984))
            Line((102.6384499583, 2.9997609984), (104.6384499637, 2.9996848913))
            Line((104.6384499637, 2.9996848913), (104.6385909981, 9.4999891517))
            ThreePointArc((104.6385909981, 9.4999891517), (104.4921443889, 9.8535533906), (104.1385909983, 10))
            Line((104.1385909983, 10), (97.6382867374, 10))
            Line((97.6382867374, 10), (97.6383194514, 7.9999999934))
            Line((97.6383194514, 7.9999999934), (100.43342089, 7.9999999934))
            ThreePointArc((100.43342089, 7.9999999934), (100.894540303, 7.6918886246), (100.7863432733, 7.1479611189))
            Line((100.7863432733, 7.1479611189), (97.6383194504, 3.9999836431))
            Line((97.6383194504, 3.9999836431), (91.6384503069, 3.9999836431))
            Line((91.6384503069, 3.9999836431), (88.4904264839, 7.1479611189))
            ThreePointArc((88.4904264839, 7.1479611189), (88.3822294542, 7.6918886246), (88.8433488673, 7.9999999934))
            Line((88.8433488673, 7.9999999934), (91.6384503058, 7.9999999934))
            Line((91.6384503058, 7.9999999934), (91.6384830198, 10))
            Line((91.6384830198, 10), (85.1381787589, 10))
            ThreePointArc((85.1381787589, 10), (84.7846253684, 9.8535533906), (84.6381787589, 9.5))
            Line((84.6381787589, 9.5), (84.6383197935, 2.9996848913))
            Line((84.6383197935, 2.9996848913), (86.6383197989, 2.9997609984))
            Line((86.6383197989, 2.9997609984), (86.6382591548, 5.7948624374))
            ThreePointArc((86.6382591548, 5.7948624374), (86.9463605188, 6.2559885353), (87.4902903719, 6.147803307))
            Line((87.4902903719, 6.147803307), (90.6383361483, 2.9998477851))
            Line((90.6383361483, 2.9998477851), (90.6383361483, -2.9998477851))
            Line((90.6383361483, -2.9998477851), (87.4902903719, -6.147803307))
            ThreePointArc((87.4902903719, -6.147803307), (86.9463605188, -6.2559885353), (86.6382591548, -5.7948624374))
            Line((86.6382591548, -5.7948624374), (86.6383197989, -2.9997609984))
            Line((86.6383197989, -2.9997609984), (84.6383197935, -2.9996848913))
            Line((84.6383197935, -2.9996848913), (84.6381787592, -9.4999891517))
            ThreePointArc((84.6381787592, -9.4999891517), (84.7846253684, -9.8535533906), (85.1381787589, -10))
            Line((85.1381787589, -10), (91.6384830198, -10))
            Line((91.6384830198, -10), (91.6384503058, -7.9999999934))
            Line((91.6384503058, -7.9999999934), (88.8433488673, -7.9999999934))
            ThreePointArc((88.8433488673, -7.9999999934), (88.3822294542, -7.6918886246), (88.4904264839, -7.1479611189))
            Line((88.4904264839, -7.1479611189), (91.6384503069, -3.9999836431))
            Line((91.6384503069, -3.9999836431), (97.6383194504, -3.9999836431))
            Line((97.6383194504, -3.9999836431), (100.7863432733, -7.1479611189))
            ThreePointArc((100.7863432733, -7.1479611189), (100.894540303, -7.6918886246), (100.43342089, -7.9999999934))
        make_face()
        with Locations((94.6383848786, 0)):
            Circle(F0_R, mode=Mode.SUBTRACT)
    extrude(amount=F3_DEPTH)


solid = Compound([f1.part, f2.part, f3.part])
